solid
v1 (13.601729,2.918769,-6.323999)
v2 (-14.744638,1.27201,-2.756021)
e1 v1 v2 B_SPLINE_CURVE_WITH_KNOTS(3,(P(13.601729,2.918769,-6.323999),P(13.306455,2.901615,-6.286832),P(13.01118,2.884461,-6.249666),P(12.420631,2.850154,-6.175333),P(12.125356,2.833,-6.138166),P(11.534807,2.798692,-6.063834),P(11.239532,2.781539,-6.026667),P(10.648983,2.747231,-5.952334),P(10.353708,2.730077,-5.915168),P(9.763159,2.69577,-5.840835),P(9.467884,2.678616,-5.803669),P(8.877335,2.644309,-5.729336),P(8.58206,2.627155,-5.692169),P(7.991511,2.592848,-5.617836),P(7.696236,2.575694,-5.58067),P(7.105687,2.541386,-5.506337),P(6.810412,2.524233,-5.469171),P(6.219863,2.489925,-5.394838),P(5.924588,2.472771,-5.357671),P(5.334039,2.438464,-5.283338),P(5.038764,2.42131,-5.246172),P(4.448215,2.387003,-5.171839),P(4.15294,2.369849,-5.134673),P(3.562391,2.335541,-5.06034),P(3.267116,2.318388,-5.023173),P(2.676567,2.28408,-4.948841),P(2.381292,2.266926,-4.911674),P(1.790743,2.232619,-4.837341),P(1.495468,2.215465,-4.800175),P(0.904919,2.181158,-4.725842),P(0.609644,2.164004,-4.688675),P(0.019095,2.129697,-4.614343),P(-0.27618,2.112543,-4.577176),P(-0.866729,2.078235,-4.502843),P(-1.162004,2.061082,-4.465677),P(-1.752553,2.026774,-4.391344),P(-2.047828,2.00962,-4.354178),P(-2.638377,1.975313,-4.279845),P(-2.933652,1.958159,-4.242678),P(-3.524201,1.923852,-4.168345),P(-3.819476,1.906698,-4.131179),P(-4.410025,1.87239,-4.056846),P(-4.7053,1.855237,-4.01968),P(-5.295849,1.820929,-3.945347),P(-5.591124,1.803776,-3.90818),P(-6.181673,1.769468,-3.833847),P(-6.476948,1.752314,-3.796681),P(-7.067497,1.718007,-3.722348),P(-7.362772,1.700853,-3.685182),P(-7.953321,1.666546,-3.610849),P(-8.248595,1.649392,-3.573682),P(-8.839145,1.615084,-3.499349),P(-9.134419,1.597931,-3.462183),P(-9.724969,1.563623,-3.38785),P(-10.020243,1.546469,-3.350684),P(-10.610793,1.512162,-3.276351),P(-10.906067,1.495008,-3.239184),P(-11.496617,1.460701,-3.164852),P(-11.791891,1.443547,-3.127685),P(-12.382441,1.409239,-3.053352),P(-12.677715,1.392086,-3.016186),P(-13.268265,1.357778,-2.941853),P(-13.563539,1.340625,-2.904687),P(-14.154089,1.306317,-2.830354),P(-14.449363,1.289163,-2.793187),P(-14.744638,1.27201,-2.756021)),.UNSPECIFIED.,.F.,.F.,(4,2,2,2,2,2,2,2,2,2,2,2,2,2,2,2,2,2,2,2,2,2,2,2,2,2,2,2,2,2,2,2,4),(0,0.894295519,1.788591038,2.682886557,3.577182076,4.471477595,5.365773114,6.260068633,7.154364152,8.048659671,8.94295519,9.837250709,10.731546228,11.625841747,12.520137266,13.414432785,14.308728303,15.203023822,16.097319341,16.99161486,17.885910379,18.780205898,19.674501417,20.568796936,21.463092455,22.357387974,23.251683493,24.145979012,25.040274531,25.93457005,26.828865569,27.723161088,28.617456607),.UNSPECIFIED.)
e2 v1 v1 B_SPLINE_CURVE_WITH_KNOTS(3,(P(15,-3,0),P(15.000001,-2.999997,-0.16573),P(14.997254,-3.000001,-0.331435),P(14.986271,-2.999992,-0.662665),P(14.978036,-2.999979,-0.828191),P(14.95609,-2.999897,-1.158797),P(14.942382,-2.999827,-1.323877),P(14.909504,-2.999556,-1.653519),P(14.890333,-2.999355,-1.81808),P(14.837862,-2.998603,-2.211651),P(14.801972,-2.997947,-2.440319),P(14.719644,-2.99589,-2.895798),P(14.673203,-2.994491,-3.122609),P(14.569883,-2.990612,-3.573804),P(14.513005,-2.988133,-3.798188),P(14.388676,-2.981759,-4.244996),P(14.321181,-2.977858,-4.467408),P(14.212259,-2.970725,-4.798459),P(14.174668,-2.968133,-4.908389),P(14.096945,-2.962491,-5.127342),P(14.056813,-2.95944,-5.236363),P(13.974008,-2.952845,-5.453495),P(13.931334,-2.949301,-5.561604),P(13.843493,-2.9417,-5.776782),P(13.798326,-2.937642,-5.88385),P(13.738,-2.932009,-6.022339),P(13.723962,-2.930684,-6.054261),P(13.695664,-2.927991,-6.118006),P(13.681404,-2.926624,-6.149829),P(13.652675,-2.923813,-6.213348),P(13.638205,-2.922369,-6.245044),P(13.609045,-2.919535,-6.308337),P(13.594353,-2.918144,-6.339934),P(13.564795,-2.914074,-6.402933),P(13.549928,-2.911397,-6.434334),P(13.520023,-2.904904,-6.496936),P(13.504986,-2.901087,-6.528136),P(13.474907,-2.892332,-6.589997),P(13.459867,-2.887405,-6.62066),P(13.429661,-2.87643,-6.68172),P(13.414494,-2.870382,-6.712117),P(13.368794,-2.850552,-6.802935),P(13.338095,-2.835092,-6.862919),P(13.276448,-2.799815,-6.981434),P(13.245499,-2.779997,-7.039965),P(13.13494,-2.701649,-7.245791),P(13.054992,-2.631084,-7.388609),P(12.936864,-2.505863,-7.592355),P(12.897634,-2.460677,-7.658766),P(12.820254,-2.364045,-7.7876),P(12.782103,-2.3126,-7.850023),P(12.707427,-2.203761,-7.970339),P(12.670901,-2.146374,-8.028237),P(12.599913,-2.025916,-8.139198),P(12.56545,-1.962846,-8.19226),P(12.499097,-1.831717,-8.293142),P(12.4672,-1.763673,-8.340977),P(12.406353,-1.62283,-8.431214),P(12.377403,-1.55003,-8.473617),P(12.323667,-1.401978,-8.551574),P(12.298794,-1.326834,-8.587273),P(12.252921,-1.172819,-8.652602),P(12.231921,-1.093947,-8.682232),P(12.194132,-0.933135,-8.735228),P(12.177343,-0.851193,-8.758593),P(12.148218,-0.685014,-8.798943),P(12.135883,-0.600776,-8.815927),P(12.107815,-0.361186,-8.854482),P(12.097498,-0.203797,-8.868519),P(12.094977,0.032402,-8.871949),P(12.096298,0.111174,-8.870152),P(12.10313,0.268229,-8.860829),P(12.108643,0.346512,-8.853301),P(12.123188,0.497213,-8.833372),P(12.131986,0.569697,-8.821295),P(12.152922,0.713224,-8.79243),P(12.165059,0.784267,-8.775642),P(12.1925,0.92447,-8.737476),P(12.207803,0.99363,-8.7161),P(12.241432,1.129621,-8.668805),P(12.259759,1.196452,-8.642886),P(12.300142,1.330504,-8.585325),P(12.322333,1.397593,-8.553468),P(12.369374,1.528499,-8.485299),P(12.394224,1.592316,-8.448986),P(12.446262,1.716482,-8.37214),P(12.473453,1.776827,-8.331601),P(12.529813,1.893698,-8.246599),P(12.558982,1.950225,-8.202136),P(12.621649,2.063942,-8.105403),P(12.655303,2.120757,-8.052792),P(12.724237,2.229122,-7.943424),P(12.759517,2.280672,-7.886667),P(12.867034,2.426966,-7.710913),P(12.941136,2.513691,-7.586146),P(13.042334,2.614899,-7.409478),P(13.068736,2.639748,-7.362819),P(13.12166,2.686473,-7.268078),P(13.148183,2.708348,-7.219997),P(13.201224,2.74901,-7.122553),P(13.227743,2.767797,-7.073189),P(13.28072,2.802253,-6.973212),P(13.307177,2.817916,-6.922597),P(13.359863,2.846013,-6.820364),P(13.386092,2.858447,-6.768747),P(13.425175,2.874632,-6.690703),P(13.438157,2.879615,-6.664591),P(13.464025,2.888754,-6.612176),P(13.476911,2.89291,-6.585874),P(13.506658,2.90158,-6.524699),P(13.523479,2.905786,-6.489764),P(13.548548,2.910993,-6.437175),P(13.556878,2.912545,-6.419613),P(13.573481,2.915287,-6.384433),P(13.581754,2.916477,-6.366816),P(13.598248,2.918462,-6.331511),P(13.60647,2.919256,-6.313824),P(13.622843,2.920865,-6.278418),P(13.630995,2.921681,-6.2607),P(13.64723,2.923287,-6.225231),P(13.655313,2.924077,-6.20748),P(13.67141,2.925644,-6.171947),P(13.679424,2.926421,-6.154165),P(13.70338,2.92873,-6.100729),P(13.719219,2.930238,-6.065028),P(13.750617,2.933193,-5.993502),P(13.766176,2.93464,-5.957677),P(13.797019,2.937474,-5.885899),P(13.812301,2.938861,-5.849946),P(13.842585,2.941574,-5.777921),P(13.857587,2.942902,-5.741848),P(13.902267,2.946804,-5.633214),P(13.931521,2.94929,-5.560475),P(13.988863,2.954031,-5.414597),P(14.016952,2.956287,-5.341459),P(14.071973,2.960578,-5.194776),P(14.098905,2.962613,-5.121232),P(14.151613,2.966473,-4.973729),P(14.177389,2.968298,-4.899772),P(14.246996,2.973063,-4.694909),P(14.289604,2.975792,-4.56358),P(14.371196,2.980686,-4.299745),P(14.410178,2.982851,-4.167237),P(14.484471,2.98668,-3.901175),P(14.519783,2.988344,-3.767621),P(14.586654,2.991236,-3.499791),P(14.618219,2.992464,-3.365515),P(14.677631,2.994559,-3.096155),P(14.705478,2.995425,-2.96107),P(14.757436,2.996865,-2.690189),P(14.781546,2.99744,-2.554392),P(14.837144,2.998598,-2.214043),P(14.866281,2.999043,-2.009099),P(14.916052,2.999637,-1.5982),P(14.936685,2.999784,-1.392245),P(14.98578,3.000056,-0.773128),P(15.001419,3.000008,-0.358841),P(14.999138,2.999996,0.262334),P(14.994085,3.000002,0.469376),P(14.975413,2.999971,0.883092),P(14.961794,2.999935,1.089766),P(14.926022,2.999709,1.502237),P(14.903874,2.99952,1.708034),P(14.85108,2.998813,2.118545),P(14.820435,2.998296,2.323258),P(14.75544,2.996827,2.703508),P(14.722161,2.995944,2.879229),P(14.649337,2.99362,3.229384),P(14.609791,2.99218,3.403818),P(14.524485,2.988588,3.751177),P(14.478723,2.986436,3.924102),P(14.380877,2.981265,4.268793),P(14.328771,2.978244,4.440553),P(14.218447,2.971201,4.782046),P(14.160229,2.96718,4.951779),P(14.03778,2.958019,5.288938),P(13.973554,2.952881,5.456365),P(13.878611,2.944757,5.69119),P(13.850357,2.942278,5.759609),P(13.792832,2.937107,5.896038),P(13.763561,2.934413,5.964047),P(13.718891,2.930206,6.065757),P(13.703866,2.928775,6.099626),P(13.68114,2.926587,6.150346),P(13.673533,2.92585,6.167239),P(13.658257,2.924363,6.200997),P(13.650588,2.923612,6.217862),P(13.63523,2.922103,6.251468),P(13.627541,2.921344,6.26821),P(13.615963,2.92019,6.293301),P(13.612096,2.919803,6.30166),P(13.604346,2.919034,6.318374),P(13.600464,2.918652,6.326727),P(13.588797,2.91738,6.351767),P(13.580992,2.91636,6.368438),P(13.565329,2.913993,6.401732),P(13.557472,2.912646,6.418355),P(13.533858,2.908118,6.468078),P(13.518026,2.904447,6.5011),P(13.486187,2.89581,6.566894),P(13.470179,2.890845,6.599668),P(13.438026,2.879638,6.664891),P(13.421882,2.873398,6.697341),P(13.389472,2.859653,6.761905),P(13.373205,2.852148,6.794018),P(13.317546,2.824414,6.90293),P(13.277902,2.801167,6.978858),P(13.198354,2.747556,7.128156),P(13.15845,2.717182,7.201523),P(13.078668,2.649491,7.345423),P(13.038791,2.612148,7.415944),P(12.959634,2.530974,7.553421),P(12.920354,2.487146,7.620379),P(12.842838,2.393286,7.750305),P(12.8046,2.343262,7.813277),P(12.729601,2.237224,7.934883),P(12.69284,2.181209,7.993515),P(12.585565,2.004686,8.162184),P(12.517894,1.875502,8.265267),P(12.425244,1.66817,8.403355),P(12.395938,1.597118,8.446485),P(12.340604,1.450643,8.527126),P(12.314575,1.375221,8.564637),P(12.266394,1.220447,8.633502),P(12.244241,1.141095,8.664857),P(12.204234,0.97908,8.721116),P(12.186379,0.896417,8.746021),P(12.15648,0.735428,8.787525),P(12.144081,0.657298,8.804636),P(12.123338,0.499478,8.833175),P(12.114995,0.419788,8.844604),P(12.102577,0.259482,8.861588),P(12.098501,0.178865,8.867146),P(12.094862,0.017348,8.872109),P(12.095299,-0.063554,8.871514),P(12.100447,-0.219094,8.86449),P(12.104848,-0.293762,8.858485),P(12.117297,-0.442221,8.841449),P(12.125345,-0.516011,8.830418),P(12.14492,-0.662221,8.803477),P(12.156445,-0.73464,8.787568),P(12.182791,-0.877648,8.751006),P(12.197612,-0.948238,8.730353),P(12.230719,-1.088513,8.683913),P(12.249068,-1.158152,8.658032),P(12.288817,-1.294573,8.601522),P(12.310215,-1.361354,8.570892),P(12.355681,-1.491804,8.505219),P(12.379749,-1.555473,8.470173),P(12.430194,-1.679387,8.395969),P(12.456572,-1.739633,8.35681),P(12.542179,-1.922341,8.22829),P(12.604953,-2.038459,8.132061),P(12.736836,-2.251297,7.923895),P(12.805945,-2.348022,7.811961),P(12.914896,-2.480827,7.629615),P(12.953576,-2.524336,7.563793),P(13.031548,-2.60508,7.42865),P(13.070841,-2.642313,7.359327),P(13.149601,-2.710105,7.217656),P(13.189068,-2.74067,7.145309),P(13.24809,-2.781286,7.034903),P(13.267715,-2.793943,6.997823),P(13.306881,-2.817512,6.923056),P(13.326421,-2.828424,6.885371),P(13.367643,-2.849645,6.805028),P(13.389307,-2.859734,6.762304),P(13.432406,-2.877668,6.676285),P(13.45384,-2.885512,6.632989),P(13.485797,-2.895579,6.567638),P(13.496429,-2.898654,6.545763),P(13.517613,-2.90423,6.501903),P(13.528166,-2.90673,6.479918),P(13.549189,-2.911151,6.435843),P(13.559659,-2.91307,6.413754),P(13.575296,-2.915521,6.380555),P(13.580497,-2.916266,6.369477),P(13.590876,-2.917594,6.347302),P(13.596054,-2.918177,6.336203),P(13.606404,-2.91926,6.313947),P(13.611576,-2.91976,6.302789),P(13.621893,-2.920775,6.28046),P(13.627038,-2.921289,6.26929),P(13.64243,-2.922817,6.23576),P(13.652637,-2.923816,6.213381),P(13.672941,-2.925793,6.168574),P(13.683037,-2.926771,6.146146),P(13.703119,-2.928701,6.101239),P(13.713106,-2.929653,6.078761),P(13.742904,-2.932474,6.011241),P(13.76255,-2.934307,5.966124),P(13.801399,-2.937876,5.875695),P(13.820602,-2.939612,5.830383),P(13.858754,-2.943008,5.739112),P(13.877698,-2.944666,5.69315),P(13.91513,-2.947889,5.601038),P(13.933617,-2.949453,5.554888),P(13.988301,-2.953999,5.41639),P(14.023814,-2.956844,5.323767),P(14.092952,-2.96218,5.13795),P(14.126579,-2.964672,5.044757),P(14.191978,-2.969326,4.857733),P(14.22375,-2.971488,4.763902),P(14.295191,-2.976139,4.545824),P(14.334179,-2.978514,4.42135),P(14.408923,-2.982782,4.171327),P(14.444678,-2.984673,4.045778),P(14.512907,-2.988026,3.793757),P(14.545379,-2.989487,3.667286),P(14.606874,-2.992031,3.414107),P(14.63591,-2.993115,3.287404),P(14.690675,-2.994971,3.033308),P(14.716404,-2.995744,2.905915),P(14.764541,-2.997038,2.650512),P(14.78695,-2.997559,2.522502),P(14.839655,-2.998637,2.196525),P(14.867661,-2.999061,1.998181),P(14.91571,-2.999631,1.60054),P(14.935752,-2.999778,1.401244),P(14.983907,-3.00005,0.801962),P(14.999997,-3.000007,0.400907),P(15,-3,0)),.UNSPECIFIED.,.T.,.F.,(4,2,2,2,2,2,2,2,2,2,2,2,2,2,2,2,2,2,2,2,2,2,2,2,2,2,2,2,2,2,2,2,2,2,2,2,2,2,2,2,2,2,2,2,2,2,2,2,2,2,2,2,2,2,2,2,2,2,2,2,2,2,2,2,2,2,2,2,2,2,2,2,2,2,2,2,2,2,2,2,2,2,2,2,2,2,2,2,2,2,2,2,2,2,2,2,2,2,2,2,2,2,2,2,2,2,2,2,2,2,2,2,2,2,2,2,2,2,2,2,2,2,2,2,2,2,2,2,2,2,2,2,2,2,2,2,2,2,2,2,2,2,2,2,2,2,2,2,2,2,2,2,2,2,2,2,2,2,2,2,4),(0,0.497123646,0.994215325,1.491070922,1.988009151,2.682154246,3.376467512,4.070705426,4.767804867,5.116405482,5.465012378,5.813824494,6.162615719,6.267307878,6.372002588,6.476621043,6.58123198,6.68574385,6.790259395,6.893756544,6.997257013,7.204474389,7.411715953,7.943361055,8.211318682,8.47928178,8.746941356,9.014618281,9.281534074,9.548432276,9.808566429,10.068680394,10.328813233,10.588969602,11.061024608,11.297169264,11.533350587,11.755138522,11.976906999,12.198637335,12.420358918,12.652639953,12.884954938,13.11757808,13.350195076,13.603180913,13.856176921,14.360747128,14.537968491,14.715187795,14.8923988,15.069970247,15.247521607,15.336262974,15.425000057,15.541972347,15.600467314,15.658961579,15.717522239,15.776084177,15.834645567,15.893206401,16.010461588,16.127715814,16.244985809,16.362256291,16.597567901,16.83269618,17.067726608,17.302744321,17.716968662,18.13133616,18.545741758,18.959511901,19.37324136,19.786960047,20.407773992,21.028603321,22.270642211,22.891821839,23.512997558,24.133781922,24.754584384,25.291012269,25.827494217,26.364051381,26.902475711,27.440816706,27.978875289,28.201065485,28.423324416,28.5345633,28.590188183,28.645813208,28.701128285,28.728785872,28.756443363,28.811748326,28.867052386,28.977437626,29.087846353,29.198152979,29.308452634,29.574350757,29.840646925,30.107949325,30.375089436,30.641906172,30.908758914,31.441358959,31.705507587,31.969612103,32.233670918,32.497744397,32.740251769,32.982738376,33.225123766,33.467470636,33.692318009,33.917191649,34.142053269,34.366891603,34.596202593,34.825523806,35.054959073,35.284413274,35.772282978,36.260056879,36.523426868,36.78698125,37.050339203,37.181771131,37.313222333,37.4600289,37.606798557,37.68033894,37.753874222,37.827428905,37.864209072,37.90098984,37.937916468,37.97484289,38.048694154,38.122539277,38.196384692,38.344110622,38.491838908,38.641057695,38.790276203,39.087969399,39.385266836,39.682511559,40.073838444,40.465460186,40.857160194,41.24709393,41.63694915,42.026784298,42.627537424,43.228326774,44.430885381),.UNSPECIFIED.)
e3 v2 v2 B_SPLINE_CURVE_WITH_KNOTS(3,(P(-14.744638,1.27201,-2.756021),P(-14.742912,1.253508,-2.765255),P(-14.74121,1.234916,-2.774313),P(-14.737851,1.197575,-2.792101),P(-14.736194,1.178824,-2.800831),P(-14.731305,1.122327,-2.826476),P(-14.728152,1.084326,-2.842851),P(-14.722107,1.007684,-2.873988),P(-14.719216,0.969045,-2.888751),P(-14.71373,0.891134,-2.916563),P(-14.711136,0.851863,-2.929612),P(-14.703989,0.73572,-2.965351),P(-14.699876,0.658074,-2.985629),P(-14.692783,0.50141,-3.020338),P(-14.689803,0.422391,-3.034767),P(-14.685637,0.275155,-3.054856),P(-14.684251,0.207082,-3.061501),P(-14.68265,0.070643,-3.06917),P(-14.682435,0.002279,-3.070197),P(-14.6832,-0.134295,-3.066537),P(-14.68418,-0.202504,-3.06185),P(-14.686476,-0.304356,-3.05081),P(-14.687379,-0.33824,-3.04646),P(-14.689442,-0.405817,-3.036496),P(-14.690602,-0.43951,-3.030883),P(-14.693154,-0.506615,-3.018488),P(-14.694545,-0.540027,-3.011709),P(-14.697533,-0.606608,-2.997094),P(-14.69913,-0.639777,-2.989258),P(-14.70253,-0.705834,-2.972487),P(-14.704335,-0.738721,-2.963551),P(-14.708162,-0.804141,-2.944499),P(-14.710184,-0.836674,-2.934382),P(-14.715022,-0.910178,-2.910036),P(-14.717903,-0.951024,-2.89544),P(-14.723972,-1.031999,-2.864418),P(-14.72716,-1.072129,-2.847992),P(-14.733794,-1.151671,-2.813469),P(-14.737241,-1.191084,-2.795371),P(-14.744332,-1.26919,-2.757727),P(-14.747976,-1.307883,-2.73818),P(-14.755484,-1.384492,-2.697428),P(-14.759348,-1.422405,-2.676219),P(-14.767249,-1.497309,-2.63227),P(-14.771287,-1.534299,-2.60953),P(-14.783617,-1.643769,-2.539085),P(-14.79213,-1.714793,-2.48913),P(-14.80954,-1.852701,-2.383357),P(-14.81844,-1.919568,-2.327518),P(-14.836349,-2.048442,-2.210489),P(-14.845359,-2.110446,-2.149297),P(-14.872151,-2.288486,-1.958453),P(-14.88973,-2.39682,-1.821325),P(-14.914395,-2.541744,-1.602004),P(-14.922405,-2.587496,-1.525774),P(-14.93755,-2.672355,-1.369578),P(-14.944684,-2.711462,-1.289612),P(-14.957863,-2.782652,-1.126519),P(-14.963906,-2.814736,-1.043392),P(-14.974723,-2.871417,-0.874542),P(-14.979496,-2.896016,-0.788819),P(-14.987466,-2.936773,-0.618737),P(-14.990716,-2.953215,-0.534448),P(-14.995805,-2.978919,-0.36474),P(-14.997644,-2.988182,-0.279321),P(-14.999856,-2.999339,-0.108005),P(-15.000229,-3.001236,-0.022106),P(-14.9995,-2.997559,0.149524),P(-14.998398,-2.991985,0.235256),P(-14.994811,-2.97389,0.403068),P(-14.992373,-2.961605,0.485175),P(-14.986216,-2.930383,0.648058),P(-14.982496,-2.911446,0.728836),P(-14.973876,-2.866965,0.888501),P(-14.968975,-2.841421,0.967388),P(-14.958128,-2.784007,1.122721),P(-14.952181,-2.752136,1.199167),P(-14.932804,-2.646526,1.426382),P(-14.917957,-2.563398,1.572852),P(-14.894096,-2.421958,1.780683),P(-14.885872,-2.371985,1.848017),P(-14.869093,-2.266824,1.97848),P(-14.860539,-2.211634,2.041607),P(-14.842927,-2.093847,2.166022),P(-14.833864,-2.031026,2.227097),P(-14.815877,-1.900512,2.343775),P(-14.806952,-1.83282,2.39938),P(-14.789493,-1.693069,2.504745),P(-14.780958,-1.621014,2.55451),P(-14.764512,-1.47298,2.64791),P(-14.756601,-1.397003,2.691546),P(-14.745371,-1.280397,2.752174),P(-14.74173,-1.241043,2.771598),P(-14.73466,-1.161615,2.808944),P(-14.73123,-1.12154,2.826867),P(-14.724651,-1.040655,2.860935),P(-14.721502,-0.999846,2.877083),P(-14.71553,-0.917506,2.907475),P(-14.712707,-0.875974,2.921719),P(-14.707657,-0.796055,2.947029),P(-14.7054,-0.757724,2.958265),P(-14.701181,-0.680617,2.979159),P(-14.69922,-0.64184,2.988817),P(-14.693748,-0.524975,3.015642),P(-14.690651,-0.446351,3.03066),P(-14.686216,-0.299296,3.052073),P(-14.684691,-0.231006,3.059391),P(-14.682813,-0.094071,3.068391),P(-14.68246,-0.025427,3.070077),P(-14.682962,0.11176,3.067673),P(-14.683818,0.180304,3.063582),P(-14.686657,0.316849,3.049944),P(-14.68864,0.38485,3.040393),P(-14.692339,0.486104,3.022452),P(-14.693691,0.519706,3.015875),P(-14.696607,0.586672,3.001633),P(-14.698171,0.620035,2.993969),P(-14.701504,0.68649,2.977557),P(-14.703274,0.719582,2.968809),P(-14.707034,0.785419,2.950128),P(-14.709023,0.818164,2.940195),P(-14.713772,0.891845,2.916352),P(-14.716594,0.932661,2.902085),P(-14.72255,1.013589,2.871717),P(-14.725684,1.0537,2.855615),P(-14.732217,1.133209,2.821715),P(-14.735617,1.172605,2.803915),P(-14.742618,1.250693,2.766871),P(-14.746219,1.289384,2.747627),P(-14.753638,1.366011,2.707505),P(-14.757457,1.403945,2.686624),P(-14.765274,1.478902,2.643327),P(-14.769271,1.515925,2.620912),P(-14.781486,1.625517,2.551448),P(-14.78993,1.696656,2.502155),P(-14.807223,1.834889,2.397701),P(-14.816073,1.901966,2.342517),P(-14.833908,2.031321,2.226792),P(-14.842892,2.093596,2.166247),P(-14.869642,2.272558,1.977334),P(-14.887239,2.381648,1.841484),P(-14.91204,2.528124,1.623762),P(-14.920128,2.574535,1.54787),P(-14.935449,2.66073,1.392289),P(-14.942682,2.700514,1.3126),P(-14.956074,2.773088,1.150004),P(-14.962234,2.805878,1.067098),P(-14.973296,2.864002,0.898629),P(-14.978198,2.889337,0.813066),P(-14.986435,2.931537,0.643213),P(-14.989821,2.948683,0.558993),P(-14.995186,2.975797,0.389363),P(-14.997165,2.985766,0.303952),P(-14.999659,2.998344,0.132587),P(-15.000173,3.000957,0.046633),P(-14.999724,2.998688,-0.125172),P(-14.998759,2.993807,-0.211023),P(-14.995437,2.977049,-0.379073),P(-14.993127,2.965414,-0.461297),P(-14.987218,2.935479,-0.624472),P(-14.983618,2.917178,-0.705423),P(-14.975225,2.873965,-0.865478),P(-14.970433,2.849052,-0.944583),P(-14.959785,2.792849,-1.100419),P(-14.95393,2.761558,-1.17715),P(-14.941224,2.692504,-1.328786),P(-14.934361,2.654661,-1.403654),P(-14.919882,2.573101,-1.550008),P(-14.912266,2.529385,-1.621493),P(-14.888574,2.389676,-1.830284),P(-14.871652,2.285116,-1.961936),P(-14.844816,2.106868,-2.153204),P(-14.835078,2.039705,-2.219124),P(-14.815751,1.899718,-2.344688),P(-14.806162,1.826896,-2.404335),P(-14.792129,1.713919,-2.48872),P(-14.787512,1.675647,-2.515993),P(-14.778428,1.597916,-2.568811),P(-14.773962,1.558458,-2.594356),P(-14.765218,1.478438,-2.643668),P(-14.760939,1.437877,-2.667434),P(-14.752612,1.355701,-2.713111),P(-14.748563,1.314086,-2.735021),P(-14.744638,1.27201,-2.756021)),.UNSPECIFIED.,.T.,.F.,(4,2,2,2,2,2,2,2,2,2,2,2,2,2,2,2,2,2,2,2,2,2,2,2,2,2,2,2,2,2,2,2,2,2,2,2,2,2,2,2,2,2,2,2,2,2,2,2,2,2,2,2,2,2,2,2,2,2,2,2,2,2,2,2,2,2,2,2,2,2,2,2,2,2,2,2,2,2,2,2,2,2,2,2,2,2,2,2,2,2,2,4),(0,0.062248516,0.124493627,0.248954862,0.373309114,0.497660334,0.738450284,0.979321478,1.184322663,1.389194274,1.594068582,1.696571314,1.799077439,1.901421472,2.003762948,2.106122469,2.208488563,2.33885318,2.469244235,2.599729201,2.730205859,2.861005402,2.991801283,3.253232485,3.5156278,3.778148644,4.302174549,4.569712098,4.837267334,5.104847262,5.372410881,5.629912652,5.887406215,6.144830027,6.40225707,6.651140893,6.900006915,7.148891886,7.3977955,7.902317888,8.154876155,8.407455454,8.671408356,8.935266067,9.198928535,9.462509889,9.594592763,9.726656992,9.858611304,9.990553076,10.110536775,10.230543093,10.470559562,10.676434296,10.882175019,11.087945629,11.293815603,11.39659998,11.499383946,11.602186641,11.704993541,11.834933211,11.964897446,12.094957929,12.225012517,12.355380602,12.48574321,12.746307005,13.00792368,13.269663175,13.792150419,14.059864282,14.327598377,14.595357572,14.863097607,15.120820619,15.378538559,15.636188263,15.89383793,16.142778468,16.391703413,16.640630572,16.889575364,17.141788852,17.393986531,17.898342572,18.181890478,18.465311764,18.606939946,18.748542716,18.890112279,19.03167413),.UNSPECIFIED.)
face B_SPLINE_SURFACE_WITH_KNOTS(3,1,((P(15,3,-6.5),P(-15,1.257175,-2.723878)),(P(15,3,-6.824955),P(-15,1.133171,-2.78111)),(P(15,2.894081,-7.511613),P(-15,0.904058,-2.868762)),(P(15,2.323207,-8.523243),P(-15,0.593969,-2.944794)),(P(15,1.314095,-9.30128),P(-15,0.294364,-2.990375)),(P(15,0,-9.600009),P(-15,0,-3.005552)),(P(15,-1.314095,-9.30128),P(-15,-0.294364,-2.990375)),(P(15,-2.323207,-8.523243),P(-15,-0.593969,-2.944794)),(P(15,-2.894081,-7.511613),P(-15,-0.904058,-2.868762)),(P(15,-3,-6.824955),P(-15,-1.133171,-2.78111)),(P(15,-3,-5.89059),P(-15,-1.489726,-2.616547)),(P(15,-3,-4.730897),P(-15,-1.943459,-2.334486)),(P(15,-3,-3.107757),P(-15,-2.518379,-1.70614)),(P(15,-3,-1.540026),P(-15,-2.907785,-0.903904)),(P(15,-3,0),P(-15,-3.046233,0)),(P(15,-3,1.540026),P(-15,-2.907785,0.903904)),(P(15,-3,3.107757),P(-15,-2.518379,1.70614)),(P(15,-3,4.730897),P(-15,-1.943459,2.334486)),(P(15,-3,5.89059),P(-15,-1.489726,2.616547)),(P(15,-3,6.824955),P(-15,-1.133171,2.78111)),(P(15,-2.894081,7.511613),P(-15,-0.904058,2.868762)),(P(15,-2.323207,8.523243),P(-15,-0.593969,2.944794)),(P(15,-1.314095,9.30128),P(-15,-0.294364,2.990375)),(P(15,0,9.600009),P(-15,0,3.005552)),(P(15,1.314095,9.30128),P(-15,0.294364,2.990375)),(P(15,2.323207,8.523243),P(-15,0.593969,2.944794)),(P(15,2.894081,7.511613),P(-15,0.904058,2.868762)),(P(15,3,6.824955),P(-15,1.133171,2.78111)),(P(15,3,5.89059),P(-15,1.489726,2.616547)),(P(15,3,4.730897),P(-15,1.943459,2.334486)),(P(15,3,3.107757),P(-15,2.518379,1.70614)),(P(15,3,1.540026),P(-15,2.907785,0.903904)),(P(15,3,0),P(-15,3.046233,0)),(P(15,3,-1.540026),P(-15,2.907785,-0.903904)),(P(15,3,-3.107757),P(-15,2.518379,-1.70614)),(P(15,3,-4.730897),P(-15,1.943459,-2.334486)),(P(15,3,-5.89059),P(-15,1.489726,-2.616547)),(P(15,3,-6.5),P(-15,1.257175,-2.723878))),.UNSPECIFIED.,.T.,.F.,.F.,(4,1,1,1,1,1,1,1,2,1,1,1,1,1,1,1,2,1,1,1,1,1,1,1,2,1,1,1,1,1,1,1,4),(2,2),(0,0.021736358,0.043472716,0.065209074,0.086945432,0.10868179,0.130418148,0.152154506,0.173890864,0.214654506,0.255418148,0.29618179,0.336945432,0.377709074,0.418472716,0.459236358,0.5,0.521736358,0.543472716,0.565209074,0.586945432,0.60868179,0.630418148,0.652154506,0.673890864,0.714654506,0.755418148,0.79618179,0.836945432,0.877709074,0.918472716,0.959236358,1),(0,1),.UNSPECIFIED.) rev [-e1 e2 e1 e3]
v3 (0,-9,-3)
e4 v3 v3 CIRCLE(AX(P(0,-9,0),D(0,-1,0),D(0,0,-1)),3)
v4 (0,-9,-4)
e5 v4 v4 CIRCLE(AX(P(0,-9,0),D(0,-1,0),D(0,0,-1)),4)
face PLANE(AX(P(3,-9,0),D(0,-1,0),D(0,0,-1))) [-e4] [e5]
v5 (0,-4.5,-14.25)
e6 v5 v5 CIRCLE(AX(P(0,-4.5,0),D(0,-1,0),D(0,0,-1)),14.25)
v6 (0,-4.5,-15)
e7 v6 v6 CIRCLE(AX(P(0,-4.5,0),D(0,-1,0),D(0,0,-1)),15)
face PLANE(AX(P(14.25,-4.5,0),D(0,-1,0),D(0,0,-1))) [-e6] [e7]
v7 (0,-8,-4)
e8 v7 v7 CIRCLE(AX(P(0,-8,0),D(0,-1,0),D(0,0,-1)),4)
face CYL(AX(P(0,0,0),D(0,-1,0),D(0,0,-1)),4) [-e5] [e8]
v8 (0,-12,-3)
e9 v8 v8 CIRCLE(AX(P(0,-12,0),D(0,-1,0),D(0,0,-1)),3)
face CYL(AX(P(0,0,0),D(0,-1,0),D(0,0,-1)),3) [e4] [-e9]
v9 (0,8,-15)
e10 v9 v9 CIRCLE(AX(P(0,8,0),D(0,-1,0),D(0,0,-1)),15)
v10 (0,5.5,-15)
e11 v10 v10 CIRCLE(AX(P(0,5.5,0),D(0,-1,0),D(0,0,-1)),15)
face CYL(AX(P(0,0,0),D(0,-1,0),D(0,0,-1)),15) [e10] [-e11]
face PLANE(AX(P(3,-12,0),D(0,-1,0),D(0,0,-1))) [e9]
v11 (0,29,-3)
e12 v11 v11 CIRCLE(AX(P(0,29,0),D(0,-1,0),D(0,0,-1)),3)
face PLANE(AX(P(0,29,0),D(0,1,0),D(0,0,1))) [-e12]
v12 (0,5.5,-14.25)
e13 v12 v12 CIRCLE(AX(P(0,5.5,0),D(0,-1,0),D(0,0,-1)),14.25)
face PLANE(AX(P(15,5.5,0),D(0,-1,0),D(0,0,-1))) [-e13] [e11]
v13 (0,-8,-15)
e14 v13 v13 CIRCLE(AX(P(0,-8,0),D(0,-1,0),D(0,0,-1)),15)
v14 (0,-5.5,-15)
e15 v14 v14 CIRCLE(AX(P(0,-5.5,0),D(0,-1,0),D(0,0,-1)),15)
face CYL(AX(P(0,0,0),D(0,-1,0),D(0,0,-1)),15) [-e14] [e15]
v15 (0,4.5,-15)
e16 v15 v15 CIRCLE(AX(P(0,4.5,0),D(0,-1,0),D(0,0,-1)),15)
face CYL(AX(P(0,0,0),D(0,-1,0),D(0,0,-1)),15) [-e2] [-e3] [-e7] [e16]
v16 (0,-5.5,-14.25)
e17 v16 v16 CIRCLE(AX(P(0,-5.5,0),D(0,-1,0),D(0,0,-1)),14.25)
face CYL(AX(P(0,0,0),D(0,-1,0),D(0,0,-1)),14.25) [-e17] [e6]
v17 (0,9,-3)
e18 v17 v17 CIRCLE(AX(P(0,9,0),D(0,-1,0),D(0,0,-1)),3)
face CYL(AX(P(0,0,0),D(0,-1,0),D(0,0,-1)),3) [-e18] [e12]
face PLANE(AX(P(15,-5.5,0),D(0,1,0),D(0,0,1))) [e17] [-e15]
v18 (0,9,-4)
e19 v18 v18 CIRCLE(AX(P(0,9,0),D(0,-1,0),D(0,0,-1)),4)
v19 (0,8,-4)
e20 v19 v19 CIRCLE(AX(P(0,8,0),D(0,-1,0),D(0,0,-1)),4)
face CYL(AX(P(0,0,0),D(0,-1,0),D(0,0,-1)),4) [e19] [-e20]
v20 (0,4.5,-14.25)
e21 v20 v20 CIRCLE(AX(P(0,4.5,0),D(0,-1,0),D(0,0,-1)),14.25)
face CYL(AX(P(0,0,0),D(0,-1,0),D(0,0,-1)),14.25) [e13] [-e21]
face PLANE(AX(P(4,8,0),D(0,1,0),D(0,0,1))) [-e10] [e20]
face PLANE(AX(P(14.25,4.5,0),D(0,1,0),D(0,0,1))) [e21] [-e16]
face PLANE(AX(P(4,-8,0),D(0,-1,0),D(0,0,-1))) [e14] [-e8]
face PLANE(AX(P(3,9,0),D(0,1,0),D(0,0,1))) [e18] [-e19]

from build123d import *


with BuildPart() as part:
    # Esboço1 → Revolução1 (revolve)
    with BuildSketch(Plane.XY, mode=Mode.PRIVATE) as revolu_o1_sk:
        Polygon((0, 29), (3, 29), (3, 9), (4, 9), (4, 8), (15, 8), (15, 5.5), (14.25, 5.5), (14.25, 4.5), (15, 4.5), (15, -4.5), (14.25, -4.5), (14.25, -5.5), (15, -5.5), (15, -8), (4, -8), (4, -9), (3, -9), (3, -12), (0, -12), (0, 0), align=None)
    revolve(revolu_o1_sk.sketch.rotate(Axis((0, 0, 0), (0, 1, 0)), 90), axis=Axis((0, 0, 0), (0, 1, 0)))

    # Loft de corte1: read off the stored shape, not the designer's step
    # Loft de corte1: loft between two sections, ruled curve by curve
    loft_de_corte1_from = [
        Edge.make_bspline([(15, 3, -6.499999998), (15, 3, -6.824955331), (15, 2.894080758, -7.511612667), (15, 2.323207443, -8.52324288), (15, 1.314094875, -9.301280201), (15, 0, -9.600009215), (15, -1.314094875, -9.301280201), (15, -2.323207443, -8.52324288), (15, -2.894080758, -7.511612667), (15, -3, -6.824955331), (15, -3, -5.890589586), (15, -3, -4.730897439), (15, -3, -3.107757012), (15, -3, -1.540026122), (15, -3, 0), (15, -3, 1.540026122), (15, -3, 3.107757012), (15, -3, 4.730897439), (15, -3, 5.890589586), (15, -3, 6.824955331), (15, -2.894080758, 7.511612667), (15, -2.323207443, 8.52324288), (15, -1.314094875, 9.301280201), (15, 0, 9.600009215), (15, 1.314094875, 9.301280201), (15, 2.323207443, 8.52324288), (15, 2.894080758, 7.511612667), (15, 3, 6.824955331), (15, 3, 5.890589586), (15, 3, 4.730897439), (15, 3, 3.107757012), (15, 3, 1.540026122), (15, 3, 0), (15, 3, -1.540026122), (15, 3, -3.107757012), (15, 3, -4.730897439), (15, 3, -5.890589586), (15, 3, -6.499999998)], [0, 0, 0, 0, 0.021736358, 0.043472716, 0.065209074, 0.086945432, 0.10868179, 0.130418148, 0.152154506, 0.173890864, 0.173890864, 0.214654506, 0.255418148, 0.29618179, 0.336945432, 0.377709074, 0.418472716, 0.459236358, 0.5, 0.5, 0.521736358, 0.543472716, 0.565209074, 0.586945432, 0.60868179, 0.630418148, 0.652154506, 0.673890864, 0.673890864, 0.714654506, 0.755418148, 0.79618179, 0.836945432, 0.877709074, 0.918472716, 0.959236358, 1, 1, 1, 1], 3),
    ]
    loft_de_corte1_to = [
        Edge.make_bspline([(-15, 1.257174528, -2.723878155), (-15, 1.133171283, -2.781110422), (-15, 0.904058011, -2.868761786), (-15, 0.593969465, -2.944793646), (-15, 0.29436397, -2.990374654), (-15, 0, -3.005552445), (-15, -0.29436397, -2.990374654), (-15, -0.593969465, -2.944793646), (-15, -0.904058011, -2.868761786), (-15, -1.133171283, -2.781110422), (-15, -1.489726085, -2.616546668), (-15, -1.943458979, -2.334486452), (-15, -2.518379121, -1.706139583), (-15, -2.907784722, -0.903903988), (-15, -3.046232987, 0), (-15, -2.907784722, 0.903903988), (-15, -2.518379121, 1.706139583), (-15, -1.943458979, 2.334486452), (-15, -1.489726085, 2.616546668), (-15, -1.133171283, 2.781110422), (-15, -0.904058011, 2.868761786), (-15, -0.593969465, 2.944793646), (-15, -0.29436397, 2.990374654), (-15, 0, 3.005552445), (-15, 0.29436397, 2.990374654), (-15, 0.593969465, 2.944793646), (-15, 0.904058011, 2.868761786), (-15, 1.133171283, 2.781110422), (-15, 1.489726085, 2.616546668), (-15, 1.943458979, 2.334486452), (-15, 2.518379121, 1.706139583), (-15, 2.907784722, 0.903903988), (-15, 3.046232987, 0), (-15, 2.907784722, -0.903903988), (-15, 2.518379121, -1.706139583), (-15, 1.943458979, -2.334486452), (-15, 1.489726085, -2.616546668), (-15, 1.257174528, -2.723878155)], [0, 0, 0, 0, 0.021736358, 0.043472716, 0.065209074, 0.086945432, 0.10868179, 0.130418148, 0.152154506, 0.173890864, 0.173890864, 0.214654506, 0.255418148, 0.29618179, 0.336945432, 0.377709074, 0.418472716, 0.459236358, 0.5, 0.5, 0.521736358, 0.543472716, 0.565209074, 0.586945432, 0.60868179, 0.630418148, 0.652154506, 0.673890864, 0.673890864, 0.714654506, 0.755418148, 0.79618179, 0.836945432, 0.877709074, 0.918472716, 0.959236358, 1, 1, 1, 1], 3),
    ]
    loft_de_corte1 = Solid(Shell([*[Face.make_surface_from_curves(loft_de_corte1_from[k], loft_de_corte1_to[k]) for k in range(1)], Face(Wire(loft_de_corte1_from)), Face(Wire(loft_de_corte1_to))]))
    add(loft_de_corte1, mode=Mode.SUBTRACT)


solid = part.part
